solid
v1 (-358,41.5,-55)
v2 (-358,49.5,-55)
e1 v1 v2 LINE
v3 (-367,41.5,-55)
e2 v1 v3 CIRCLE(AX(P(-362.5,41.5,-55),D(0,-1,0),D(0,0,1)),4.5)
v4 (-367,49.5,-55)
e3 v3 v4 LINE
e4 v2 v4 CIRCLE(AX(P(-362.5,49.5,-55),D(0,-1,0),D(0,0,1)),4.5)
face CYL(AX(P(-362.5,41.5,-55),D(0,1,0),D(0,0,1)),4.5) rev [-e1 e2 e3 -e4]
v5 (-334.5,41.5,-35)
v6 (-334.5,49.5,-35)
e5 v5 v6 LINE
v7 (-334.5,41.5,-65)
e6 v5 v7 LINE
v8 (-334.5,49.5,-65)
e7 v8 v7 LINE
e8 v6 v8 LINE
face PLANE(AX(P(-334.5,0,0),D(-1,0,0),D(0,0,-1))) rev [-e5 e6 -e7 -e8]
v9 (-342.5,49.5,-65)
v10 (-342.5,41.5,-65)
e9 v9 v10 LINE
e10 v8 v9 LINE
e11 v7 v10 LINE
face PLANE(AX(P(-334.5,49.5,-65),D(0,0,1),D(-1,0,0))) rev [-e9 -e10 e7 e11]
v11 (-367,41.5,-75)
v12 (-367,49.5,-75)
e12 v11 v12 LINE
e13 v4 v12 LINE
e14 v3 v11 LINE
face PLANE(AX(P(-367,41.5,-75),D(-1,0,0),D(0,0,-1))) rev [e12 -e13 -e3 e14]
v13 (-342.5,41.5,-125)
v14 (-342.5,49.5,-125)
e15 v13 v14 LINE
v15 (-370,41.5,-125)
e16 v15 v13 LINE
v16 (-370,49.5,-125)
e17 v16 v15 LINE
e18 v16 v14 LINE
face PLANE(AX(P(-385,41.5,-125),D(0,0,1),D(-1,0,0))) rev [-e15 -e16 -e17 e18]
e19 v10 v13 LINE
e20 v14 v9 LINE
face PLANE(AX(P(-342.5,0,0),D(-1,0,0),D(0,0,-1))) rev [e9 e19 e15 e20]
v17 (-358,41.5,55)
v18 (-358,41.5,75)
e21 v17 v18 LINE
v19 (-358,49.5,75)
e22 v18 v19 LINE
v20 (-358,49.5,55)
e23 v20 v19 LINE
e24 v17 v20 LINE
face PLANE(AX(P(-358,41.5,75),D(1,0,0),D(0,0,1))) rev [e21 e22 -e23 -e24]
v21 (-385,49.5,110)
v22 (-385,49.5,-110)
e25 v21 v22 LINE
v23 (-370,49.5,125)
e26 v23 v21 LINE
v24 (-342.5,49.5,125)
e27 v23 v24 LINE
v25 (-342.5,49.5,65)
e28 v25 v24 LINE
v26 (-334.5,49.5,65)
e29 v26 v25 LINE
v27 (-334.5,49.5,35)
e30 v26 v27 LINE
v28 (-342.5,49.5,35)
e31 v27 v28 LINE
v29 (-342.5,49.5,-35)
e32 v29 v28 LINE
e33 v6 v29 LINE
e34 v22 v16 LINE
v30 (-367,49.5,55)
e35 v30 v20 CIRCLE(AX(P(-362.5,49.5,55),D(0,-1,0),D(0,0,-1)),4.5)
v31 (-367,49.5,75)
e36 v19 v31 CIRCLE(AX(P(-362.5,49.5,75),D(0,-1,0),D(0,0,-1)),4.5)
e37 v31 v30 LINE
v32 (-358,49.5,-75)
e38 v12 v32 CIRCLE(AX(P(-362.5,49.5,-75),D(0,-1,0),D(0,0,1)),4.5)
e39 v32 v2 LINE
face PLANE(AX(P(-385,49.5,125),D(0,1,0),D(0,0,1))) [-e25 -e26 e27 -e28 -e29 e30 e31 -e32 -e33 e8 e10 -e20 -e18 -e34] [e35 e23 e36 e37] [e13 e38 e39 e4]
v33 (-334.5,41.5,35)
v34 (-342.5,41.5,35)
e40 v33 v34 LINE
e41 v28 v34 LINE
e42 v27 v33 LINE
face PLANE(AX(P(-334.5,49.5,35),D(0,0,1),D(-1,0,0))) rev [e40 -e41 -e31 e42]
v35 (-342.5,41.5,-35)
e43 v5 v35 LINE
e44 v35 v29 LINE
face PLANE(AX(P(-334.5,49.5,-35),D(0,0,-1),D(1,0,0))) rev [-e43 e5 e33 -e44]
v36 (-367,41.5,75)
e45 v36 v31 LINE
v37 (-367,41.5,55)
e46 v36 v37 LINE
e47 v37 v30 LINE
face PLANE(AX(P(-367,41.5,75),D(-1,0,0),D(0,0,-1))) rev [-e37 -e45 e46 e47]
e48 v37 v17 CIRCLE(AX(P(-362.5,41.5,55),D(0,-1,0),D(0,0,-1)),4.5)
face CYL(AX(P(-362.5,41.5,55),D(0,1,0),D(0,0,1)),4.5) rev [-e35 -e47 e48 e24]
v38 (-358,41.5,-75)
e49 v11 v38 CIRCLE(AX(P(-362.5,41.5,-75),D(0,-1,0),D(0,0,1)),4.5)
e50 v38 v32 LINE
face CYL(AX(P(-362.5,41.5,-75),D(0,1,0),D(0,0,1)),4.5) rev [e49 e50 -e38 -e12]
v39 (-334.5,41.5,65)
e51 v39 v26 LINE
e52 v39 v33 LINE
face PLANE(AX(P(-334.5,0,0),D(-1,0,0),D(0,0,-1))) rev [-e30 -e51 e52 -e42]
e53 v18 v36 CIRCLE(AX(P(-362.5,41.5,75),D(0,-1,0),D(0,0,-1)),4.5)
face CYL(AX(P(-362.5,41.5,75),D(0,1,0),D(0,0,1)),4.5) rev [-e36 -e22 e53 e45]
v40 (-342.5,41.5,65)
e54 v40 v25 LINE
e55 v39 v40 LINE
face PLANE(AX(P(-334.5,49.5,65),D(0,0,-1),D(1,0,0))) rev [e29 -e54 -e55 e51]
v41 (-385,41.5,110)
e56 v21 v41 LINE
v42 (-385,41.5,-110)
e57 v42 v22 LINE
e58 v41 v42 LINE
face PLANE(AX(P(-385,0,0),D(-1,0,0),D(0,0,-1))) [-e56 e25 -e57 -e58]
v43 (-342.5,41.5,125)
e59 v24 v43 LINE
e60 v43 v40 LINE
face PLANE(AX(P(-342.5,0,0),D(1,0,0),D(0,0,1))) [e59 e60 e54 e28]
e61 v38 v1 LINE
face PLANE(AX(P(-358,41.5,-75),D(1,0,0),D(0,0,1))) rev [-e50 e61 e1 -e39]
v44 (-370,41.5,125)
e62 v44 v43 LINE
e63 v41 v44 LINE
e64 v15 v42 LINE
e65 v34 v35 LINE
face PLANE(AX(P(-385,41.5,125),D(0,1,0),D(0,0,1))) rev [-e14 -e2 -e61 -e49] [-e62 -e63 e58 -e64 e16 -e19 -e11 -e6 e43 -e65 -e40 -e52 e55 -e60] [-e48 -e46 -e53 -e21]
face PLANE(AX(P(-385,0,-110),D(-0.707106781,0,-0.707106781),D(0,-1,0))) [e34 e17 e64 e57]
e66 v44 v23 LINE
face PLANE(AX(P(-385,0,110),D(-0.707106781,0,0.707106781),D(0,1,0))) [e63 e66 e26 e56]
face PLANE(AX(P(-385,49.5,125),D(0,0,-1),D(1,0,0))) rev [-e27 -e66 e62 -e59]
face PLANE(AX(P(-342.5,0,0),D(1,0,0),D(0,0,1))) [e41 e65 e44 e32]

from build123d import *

# Parameters (mm, degrees)
SKETCH1_W           = 685
SKETCH1_H           = 250
BASE_FLANGE1_DEPTH  = 8
SKETCH6_W           = 60
SKETCH6_H           = 8
SKETCH6_W_2         = 70
EXTRUDE1_DEPTH      = 8
SKETCH7_W           = 250
SKETCH7_H           = 73.5
BASE_FLANGE2_DEPTH  = 8
SKETCH12_W          = 30.5
SKETCH12_H          = 8.5
EXTRUDE2_DEPTH      = 699.681794525
SKETCH14_W          = 250
SKETCH14_H          = 8
BASE_FLANGE3_DEPTH  = 50.5
SKETCH19_W          = 60
SKETCH19_H          = 8
SKETCH19_W_2        = 70
EXTRUDE3_DEPTH      = 8
BREAK_CORNER1_START = 41.5
BREAK_CORNER1_DEPTH = 8
EXTRUDE4_DEPTH      = 8
BASE_FLANGE4_DEPTH  = 8
SKETCH38_W          = 8.5
SKETCH38_H          = 20.5
EXTRUDE5_DEPTH      = 10
SKETCH39_W          = 20.5
SKETCH39_H          = 8.5
EXTRUDE6_DEPTH      = 10


# Read off the part's stored shape, not the designer's step: Break-Corner1
# Sheet-metal steps are written as plain solids
with BuildPart() as part:
    # Sketch1 → Base-Flange1 (new body)
    with BuildSketch(Plane(origin=(0, 0, 0), x_dir=(1, 0, 0), z_dir=(0, 1, 0))):
        Rectangle(SKETCH1_W, SKETCH1_H)
    extrude(amount=-BASE_FLANGE1_DEPTH)

    # Sketch6 → Extrude1 (cut)
    with BuildSketch(Plane(origin=(342.5, 0, 0), x_dir=(0, 0, -1), z_dir=(1, 0, 0))):
        with Locations((-95, -4)):
            Rectangle(SKETCH6_W, SKETCH6_H)
        with Locations((95, -4)):
            Rectangle(SKETCH6_W, SKETCH6_H)
        with Locations((0, -4)):
            Rectangle(SKETCH6_W_2, SKETCH6_H)
    extrude1 = extrude(amount=-EXTRUDE1_DEPTH, mode=Mode.SUBTRACT)

    # Mirror1: Extrude1 across plane
    add(extrude1.mirror(Plane(origin=(0, 0, 0), x_dir=(0, 0, 1), z_dir=(1, 0, 0))), mode=Mode.SUBTRACT)

    # Sketch39 → Extrude6 (cut)
    with BuildSketch(Plane.XZ.offset(8)):
        with Locations((289.5, 0)):
            Rectangle(SKETCH39_W, SKETCH39_H)
        with Locations((229.5, 0)):
            Rectangle(SKETCH39_W, SKETCH39_H)
        with Locations((-289.5, 0)):
            Rectangle(SKETCH39_W, SKETCH39_H)
        with Locations((-229.5, 0)):
            Rectangle(SKETCH39_W, SKETCH39_H)
    extrude(amount=-EXTRUDE6_DEPTH, mode=Mode.SUBTRACT)


with BuildPart() as body_2:
    # Sketch7 → Base-Flange2 (new body)
    with BuildSketch(Plane(origin=(334.5, 0, 0), x_dir=(0, 0, -1), z_dir=(1, 0, 0))):
        with Locations((0, 20.75)):
            Rectangle(SKETCH7_W, SKETCH7_H)
    extrude(amount=BASE_FLANGE2_DEPTH)

    # Sketch12 → Extrude2 (cut, through all)
    with BuildSketch(Plane(origin=(342.5, 0, 0), x_dir=(0, 0, -1), z_dir=(1, 0, 0))):
        with Locations((-50, -4)):
            Rectangle(SKETCH12_W, SKETCH12_H)
        with Locations((50, -4)):
            Rectangle(SKETCH12_W, SKETCH12_H)
        with Locations((50, 45.5)):
            Rectangle(SKETCH12_W, SKETCH12_H)
        with Locations((-50, 45.5)):
            Rectangle(SKETCH12_W, SKETCH12_H)
    extrude(amount=-EXTRUDE2_DEPTH, mode=Mode.SUBTRACT)

    # Sketch38 → Extrude5 (cut)
    with BuildSketch(Plane(origin=(342.5, 0, 0), x_dir=(0, 0, -1), z_dir=(1, 0, 0))):
        with Locations((0, 27.5)):
            Rectangle(SKETCH38_W, SKETCH38_H)
    extrude(amount=-EXTRUDE5_DEPTH, mode=Mode.SUBTRACT)


with BuildPart() as body_3:
    # Sketch14 → Base-Flange3 (new body)
    with BuildSketch(Plane.ZY.offset(-334.5)):
        with Locations((0, 45.5)):
            Rectangle(SKETCH14_W, SKETCH14_H)
    extrude(amount=-BASE_FLANGE3_DEPTH)

    # Sketch19 → Extrude3 (cut)
    with BuildSketch(Plane(origin=(342.5, 0, 0), x_dir=(0, 0, -1), z_dir=(1, 0, 0))):
        with Locations((95, 45.5)):
            Rectangle(SKETCH19_W, SKETCH19_H)
        with Locations((0, 45.5)):
            Rectangle(SKETCH19_W_2, SKETCH19_H)
        with Locations((-95, 45.5)):
            Rectangle(SKETCH19_W, SKETCH19_H)
    extrude(amount=-EXTRUDE3_DEPTH, mode=Mode.SUBTRACT)

    # Break-Corner1 outline → Break-Corner1 (cut)
    with BuildSketch(Plane(origin=(0, 0, 0), x_dir=(1, 0, 0), z_dir=(0, 1, 0)).offset(BREAK_CORNER1_START)):
        Polygon((385, -125), (385, -110), (370, -125), align=None)
        Polygon((370, 125), (385, 110), (385, 125), align=None)
    extrude(amount=BREAK_CORNER1_DEPTH, mode=Mode.SUBTRACT)

    # Sketch20 → Extrude4 (cut)
    with BuildSketch(Plane(origin=(0, 49.5, 0), x_dir=(1, 0, 0), z_dir=(0, 1, 0))):
        with BuildLine():
            Line((367, 75), (367, 55))
            ThreePointArc((367, 55), (362.5, 50.5), (358, 55))
            Line((358, 55), (358, 75))
            ThreePointArc((358, 75), (362.5, 79.5), (367, 75))
        make_face()
        with BuildLine():
            Line((367, -75), (367, -55))
            ThreePointArc((367, -55), (362.5, -50.5), (358, -55))
            Line((358, -55), (358, -75))
            ThreePointArc((358, -75), (362.5, -79.5), (367, -75))
        make_face()
    extrude(amount=-EXTRUDE4_DEPTH, mode=Mode.SUBTRACT)


with BuildPart() as body_4:
    # Mirror4: mirrored copy
    add(body_3.part.mirror(Plane(origin=(0, 0, 0), x_dir=(0, 0, 1), z_dir=(1, 0, 0))))


with BuildPart() as body_5:
    # Sketch29 → Base-Flange4 (new body)
    with BuildSketch(Plane.XY.offset(4)):
        Polygon((219.5, 0), (219.5, -8), (239.5, -8), (239.5, 0), (279.5, 0), (279.5, -8), (299.5, -8), (299.5, 0), (334.5, 0), (334.5, 17.5), (342.5, 17.5), (342.5, 37.5), (334.5, 37.5), (334.5, 57.5), (194.5, 10), (194.5, 0), align=None)
    extrude(amount=-BASE_FLANGE4_DEPTH)


with BuildPart() as body_6:
    # Mirror5: mirrored copy
    add(body_5.part.mirror(Plane(origin=(0, 0, 0), x_dir=(0, 0, 1), z_dir=(1, 0, 0))))


with BuildPart() as body_7:
    # Mirror3: mirrored copy
    add(body_2.part.mirror(Plane(origin=(0, 0, 0), x_dir=(0, 0, 1), z_dir=(1, 0, 0))))


solid = body_4.part
